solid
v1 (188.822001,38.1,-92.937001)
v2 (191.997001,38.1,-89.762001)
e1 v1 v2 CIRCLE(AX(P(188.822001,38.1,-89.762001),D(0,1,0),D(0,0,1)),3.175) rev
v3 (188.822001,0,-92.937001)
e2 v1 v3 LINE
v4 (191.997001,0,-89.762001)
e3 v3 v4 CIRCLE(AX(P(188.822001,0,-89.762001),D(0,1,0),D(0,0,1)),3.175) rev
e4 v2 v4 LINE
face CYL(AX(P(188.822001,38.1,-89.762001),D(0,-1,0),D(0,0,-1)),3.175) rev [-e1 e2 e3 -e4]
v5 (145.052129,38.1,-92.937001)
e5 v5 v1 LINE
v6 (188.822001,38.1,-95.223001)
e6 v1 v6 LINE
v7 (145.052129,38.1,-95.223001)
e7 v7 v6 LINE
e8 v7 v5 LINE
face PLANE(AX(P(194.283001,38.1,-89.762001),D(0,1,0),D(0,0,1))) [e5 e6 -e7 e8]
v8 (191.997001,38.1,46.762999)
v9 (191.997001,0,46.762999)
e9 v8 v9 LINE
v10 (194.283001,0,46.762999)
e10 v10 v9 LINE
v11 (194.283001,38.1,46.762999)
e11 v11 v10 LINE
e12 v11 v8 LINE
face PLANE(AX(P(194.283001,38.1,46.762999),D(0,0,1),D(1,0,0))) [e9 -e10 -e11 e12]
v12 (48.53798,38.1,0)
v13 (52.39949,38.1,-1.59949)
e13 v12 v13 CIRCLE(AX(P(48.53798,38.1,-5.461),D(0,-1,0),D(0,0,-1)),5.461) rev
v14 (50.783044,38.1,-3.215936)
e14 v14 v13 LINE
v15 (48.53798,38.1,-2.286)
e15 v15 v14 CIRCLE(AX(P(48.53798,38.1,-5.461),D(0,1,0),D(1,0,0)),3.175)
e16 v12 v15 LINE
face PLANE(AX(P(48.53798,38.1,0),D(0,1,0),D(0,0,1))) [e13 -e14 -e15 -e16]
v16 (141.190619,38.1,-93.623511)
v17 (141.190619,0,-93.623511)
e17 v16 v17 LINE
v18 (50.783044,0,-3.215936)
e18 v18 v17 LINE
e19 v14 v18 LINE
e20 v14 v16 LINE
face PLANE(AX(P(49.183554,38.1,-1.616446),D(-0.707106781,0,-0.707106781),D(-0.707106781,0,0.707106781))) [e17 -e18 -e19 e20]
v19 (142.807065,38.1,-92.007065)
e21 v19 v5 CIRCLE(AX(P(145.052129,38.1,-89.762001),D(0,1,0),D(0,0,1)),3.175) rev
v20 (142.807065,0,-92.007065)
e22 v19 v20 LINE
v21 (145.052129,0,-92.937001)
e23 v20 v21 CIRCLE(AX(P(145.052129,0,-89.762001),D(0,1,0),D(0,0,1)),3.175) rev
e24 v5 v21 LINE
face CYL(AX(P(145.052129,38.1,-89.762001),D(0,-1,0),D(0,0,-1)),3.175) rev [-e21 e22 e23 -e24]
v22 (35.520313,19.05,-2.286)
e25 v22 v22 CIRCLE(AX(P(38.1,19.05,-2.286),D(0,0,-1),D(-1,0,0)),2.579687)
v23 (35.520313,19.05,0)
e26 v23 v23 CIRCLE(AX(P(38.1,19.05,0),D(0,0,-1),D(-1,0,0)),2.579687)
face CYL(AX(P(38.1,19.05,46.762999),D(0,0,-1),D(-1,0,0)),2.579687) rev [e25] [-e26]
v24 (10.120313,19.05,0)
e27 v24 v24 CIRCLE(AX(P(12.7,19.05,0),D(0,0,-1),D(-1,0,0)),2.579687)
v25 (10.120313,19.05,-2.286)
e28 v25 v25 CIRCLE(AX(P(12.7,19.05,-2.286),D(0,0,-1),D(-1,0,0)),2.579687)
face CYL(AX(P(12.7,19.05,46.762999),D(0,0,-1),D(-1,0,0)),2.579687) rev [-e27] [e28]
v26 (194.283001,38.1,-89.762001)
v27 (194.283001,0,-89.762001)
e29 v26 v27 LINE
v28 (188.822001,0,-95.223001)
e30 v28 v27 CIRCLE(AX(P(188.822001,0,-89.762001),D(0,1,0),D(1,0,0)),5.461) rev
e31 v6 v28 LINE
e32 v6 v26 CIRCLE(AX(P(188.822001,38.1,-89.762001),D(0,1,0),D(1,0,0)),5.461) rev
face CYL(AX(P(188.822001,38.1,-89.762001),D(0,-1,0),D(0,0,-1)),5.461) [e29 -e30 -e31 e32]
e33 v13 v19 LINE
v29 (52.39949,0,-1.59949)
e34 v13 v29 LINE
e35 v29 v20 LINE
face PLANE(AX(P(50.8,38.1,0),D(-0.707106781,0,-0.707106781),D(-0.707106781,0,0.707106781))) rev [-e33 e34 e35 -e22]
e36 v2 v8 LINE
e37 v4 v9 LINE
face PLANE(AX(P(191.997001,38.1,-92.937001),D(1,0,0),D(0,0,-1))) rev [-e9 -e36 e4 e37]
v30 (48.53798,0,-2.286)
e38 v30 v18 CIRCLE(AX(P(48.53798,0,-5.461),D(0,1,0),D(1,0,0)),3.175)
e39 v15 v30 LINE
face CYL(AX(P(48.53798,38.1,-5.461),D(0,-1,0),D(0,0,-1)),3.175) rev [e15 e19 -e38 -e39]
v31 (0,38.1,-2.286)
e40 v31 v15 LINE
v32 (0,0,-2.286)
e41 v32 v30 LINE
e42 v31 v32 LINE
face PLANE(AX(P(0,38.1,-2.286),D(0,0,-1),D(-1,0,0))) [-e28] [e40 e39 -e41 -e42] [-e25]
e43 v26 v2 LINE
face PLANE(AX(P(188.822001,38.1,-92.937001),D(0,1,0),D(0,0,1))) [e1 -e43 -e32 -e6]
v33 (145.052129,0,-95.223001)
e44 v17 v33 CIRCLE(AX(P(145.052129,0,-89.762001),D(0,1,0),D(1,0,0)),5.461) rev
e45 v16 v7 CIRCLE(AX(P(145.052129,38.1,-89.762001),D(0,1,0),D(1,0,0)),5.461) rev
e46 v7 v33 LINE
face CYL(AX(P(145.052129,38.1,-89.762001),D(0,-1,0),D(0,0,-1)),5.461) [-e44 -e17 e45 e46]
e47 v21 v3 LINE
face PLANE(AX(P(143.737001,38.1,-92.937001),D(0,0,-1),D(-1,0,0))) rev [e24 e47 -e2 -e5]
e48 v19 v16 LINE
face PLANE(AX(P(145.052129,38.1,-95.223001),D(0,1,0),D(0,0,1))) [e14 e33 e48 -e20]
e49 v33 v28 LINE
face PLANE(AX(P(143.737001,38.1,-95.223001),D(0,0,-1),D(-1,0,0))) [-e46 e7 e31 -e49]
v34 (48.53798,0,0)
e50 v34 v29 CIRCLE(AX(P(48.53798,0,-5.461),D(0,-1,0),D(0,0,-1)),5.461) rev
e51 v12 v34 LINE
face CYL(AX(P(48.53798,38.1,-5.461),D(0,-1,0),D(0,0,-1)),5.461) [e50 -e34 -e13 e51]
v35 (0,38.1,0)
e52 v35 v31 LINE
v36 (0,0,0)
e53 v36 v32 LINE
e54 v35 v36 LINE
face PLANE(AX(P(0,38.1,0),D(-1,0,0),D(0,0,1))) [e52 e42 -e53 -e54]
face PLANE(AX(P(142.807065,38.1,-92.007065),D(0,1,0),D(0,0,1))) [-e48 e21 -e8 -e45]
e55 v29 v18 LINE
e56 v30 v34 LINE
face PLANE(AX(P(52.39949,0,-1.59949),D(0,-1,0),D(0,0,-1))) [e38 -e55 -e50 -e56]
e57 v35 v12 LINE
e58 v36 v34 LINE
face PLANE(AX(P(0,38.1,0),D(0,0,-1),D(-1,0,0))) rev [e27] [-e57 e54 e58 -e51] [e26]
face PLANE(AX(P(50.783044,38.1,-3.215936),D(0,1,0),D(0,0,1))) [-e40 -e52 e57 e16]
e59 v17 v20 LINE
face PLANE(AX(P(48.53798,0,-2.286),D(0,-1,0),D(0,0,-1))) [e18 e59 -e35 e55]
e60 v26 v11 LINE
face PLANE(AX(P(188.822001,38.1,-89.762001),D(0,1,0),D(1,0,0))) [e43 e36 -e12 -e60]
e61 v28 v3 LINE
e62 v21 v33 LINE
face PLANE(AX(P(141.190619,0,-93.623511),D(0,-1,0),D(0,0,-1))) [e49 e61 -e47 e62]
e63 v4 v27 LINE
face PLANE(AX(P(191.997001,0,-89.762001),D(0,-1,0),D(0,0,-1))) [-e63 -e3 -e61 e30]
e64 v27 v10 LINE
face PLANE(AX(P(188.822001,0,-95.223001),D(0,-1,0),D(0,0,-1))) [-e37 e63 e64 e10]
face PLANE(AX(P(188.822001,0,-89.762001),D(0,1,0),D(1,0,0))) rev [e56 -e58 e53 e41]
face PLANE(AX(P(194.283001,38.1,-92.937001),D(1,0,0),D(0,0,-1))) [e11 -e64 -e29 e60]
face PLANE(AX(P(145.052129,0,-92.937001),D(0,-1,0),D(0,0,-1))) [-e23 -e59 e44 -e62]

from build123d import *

# Parameters (mm, degrees)
BASE_FLANGE1_DEPTH = 38.1
SKETCH2_R          = 2.5796875
CUT_EXTRUDE1_DEPTH = 219.711637617


# Sheet-metal steps are written as plain solids
with BuildPart() as part:
    # Sketch1 → Base-Flange1 (new body)
    with BuildSketch(Plane(origin=(0, 0, 0), x_dir=(1, 0, 0), z_dir=(0, 1, 0))):
        with BuildLine():
            Line((0, 0), (48.537979736, 0))
            ThreePointArc((48.537979736, 0), (50.62781396, 0.415693873), (52.399489868, 1.599489868))
            Line((52.399489868, 1.599489868), (142.807064676, 92.007064676))
            ThreePointArc((142.807064676, 92.007064676), (143.837108809, 92.695318162), (145.052128706, 92.937000646))
            Line((145.052128706, 92.937000646), (188.822000646, 92.937000646))
            ThreePointArc((188.822000646, 92.937000646), (191.067064676, 92.007064676), (191.997000646, 89.762000646))
            Line((191.997000646, 89.762000646), (191.997000646, -46.762999354))
            Line((191.997000646, -46.762999354), (194.283000646, -46.762999354))
            Line((194.283000646, -46.762999354), (194.283000646, 89.762000646))
            ThreePointArc((194.283000646, 89.762000646), (192.683510778, 93.623510778), (188.822000646, 95.223000646))
            Line((188.822000646, 95.223000646), (145.052128706, 95.223000646))
            ThreePointArc((145.052128706, 95.223000646), (142.962294482, 94.807306773), (141.190618574, 93.623510778))
            Line((141.190618574, 93.623510778), (50.783043766, 3.21593597))
            ThreePointArc((50.783043766, 3.21593597), (49.752999634, 2.527682484), (48.537979736, 2.286))
            Line((48.537979736, 2.286), (0, 2.286))
            Line((0, 2.286), (0, 0))
        make_face()
    extrude(amount=BASE_FLANGE1_DEPTH)

    # Sketch2 → Cut-Extrude1 (cut, through all)
    with BuildSketch(Plane(origin=(0, 0, -2.286), x_dir=(-1, 0, 0), z_dir=(0, 0, -1))):
        with Locations((-12.7, 19.05)):
            Circle(SKETCH2_R)
        with Locations((-38.1, 19.05)):
            Circle(SKETCH2_R)
    extrude(amount=-CUT_EXTRUDE1_DEPTH, mode=Mode.SUBTRACT)


solid = part.part
